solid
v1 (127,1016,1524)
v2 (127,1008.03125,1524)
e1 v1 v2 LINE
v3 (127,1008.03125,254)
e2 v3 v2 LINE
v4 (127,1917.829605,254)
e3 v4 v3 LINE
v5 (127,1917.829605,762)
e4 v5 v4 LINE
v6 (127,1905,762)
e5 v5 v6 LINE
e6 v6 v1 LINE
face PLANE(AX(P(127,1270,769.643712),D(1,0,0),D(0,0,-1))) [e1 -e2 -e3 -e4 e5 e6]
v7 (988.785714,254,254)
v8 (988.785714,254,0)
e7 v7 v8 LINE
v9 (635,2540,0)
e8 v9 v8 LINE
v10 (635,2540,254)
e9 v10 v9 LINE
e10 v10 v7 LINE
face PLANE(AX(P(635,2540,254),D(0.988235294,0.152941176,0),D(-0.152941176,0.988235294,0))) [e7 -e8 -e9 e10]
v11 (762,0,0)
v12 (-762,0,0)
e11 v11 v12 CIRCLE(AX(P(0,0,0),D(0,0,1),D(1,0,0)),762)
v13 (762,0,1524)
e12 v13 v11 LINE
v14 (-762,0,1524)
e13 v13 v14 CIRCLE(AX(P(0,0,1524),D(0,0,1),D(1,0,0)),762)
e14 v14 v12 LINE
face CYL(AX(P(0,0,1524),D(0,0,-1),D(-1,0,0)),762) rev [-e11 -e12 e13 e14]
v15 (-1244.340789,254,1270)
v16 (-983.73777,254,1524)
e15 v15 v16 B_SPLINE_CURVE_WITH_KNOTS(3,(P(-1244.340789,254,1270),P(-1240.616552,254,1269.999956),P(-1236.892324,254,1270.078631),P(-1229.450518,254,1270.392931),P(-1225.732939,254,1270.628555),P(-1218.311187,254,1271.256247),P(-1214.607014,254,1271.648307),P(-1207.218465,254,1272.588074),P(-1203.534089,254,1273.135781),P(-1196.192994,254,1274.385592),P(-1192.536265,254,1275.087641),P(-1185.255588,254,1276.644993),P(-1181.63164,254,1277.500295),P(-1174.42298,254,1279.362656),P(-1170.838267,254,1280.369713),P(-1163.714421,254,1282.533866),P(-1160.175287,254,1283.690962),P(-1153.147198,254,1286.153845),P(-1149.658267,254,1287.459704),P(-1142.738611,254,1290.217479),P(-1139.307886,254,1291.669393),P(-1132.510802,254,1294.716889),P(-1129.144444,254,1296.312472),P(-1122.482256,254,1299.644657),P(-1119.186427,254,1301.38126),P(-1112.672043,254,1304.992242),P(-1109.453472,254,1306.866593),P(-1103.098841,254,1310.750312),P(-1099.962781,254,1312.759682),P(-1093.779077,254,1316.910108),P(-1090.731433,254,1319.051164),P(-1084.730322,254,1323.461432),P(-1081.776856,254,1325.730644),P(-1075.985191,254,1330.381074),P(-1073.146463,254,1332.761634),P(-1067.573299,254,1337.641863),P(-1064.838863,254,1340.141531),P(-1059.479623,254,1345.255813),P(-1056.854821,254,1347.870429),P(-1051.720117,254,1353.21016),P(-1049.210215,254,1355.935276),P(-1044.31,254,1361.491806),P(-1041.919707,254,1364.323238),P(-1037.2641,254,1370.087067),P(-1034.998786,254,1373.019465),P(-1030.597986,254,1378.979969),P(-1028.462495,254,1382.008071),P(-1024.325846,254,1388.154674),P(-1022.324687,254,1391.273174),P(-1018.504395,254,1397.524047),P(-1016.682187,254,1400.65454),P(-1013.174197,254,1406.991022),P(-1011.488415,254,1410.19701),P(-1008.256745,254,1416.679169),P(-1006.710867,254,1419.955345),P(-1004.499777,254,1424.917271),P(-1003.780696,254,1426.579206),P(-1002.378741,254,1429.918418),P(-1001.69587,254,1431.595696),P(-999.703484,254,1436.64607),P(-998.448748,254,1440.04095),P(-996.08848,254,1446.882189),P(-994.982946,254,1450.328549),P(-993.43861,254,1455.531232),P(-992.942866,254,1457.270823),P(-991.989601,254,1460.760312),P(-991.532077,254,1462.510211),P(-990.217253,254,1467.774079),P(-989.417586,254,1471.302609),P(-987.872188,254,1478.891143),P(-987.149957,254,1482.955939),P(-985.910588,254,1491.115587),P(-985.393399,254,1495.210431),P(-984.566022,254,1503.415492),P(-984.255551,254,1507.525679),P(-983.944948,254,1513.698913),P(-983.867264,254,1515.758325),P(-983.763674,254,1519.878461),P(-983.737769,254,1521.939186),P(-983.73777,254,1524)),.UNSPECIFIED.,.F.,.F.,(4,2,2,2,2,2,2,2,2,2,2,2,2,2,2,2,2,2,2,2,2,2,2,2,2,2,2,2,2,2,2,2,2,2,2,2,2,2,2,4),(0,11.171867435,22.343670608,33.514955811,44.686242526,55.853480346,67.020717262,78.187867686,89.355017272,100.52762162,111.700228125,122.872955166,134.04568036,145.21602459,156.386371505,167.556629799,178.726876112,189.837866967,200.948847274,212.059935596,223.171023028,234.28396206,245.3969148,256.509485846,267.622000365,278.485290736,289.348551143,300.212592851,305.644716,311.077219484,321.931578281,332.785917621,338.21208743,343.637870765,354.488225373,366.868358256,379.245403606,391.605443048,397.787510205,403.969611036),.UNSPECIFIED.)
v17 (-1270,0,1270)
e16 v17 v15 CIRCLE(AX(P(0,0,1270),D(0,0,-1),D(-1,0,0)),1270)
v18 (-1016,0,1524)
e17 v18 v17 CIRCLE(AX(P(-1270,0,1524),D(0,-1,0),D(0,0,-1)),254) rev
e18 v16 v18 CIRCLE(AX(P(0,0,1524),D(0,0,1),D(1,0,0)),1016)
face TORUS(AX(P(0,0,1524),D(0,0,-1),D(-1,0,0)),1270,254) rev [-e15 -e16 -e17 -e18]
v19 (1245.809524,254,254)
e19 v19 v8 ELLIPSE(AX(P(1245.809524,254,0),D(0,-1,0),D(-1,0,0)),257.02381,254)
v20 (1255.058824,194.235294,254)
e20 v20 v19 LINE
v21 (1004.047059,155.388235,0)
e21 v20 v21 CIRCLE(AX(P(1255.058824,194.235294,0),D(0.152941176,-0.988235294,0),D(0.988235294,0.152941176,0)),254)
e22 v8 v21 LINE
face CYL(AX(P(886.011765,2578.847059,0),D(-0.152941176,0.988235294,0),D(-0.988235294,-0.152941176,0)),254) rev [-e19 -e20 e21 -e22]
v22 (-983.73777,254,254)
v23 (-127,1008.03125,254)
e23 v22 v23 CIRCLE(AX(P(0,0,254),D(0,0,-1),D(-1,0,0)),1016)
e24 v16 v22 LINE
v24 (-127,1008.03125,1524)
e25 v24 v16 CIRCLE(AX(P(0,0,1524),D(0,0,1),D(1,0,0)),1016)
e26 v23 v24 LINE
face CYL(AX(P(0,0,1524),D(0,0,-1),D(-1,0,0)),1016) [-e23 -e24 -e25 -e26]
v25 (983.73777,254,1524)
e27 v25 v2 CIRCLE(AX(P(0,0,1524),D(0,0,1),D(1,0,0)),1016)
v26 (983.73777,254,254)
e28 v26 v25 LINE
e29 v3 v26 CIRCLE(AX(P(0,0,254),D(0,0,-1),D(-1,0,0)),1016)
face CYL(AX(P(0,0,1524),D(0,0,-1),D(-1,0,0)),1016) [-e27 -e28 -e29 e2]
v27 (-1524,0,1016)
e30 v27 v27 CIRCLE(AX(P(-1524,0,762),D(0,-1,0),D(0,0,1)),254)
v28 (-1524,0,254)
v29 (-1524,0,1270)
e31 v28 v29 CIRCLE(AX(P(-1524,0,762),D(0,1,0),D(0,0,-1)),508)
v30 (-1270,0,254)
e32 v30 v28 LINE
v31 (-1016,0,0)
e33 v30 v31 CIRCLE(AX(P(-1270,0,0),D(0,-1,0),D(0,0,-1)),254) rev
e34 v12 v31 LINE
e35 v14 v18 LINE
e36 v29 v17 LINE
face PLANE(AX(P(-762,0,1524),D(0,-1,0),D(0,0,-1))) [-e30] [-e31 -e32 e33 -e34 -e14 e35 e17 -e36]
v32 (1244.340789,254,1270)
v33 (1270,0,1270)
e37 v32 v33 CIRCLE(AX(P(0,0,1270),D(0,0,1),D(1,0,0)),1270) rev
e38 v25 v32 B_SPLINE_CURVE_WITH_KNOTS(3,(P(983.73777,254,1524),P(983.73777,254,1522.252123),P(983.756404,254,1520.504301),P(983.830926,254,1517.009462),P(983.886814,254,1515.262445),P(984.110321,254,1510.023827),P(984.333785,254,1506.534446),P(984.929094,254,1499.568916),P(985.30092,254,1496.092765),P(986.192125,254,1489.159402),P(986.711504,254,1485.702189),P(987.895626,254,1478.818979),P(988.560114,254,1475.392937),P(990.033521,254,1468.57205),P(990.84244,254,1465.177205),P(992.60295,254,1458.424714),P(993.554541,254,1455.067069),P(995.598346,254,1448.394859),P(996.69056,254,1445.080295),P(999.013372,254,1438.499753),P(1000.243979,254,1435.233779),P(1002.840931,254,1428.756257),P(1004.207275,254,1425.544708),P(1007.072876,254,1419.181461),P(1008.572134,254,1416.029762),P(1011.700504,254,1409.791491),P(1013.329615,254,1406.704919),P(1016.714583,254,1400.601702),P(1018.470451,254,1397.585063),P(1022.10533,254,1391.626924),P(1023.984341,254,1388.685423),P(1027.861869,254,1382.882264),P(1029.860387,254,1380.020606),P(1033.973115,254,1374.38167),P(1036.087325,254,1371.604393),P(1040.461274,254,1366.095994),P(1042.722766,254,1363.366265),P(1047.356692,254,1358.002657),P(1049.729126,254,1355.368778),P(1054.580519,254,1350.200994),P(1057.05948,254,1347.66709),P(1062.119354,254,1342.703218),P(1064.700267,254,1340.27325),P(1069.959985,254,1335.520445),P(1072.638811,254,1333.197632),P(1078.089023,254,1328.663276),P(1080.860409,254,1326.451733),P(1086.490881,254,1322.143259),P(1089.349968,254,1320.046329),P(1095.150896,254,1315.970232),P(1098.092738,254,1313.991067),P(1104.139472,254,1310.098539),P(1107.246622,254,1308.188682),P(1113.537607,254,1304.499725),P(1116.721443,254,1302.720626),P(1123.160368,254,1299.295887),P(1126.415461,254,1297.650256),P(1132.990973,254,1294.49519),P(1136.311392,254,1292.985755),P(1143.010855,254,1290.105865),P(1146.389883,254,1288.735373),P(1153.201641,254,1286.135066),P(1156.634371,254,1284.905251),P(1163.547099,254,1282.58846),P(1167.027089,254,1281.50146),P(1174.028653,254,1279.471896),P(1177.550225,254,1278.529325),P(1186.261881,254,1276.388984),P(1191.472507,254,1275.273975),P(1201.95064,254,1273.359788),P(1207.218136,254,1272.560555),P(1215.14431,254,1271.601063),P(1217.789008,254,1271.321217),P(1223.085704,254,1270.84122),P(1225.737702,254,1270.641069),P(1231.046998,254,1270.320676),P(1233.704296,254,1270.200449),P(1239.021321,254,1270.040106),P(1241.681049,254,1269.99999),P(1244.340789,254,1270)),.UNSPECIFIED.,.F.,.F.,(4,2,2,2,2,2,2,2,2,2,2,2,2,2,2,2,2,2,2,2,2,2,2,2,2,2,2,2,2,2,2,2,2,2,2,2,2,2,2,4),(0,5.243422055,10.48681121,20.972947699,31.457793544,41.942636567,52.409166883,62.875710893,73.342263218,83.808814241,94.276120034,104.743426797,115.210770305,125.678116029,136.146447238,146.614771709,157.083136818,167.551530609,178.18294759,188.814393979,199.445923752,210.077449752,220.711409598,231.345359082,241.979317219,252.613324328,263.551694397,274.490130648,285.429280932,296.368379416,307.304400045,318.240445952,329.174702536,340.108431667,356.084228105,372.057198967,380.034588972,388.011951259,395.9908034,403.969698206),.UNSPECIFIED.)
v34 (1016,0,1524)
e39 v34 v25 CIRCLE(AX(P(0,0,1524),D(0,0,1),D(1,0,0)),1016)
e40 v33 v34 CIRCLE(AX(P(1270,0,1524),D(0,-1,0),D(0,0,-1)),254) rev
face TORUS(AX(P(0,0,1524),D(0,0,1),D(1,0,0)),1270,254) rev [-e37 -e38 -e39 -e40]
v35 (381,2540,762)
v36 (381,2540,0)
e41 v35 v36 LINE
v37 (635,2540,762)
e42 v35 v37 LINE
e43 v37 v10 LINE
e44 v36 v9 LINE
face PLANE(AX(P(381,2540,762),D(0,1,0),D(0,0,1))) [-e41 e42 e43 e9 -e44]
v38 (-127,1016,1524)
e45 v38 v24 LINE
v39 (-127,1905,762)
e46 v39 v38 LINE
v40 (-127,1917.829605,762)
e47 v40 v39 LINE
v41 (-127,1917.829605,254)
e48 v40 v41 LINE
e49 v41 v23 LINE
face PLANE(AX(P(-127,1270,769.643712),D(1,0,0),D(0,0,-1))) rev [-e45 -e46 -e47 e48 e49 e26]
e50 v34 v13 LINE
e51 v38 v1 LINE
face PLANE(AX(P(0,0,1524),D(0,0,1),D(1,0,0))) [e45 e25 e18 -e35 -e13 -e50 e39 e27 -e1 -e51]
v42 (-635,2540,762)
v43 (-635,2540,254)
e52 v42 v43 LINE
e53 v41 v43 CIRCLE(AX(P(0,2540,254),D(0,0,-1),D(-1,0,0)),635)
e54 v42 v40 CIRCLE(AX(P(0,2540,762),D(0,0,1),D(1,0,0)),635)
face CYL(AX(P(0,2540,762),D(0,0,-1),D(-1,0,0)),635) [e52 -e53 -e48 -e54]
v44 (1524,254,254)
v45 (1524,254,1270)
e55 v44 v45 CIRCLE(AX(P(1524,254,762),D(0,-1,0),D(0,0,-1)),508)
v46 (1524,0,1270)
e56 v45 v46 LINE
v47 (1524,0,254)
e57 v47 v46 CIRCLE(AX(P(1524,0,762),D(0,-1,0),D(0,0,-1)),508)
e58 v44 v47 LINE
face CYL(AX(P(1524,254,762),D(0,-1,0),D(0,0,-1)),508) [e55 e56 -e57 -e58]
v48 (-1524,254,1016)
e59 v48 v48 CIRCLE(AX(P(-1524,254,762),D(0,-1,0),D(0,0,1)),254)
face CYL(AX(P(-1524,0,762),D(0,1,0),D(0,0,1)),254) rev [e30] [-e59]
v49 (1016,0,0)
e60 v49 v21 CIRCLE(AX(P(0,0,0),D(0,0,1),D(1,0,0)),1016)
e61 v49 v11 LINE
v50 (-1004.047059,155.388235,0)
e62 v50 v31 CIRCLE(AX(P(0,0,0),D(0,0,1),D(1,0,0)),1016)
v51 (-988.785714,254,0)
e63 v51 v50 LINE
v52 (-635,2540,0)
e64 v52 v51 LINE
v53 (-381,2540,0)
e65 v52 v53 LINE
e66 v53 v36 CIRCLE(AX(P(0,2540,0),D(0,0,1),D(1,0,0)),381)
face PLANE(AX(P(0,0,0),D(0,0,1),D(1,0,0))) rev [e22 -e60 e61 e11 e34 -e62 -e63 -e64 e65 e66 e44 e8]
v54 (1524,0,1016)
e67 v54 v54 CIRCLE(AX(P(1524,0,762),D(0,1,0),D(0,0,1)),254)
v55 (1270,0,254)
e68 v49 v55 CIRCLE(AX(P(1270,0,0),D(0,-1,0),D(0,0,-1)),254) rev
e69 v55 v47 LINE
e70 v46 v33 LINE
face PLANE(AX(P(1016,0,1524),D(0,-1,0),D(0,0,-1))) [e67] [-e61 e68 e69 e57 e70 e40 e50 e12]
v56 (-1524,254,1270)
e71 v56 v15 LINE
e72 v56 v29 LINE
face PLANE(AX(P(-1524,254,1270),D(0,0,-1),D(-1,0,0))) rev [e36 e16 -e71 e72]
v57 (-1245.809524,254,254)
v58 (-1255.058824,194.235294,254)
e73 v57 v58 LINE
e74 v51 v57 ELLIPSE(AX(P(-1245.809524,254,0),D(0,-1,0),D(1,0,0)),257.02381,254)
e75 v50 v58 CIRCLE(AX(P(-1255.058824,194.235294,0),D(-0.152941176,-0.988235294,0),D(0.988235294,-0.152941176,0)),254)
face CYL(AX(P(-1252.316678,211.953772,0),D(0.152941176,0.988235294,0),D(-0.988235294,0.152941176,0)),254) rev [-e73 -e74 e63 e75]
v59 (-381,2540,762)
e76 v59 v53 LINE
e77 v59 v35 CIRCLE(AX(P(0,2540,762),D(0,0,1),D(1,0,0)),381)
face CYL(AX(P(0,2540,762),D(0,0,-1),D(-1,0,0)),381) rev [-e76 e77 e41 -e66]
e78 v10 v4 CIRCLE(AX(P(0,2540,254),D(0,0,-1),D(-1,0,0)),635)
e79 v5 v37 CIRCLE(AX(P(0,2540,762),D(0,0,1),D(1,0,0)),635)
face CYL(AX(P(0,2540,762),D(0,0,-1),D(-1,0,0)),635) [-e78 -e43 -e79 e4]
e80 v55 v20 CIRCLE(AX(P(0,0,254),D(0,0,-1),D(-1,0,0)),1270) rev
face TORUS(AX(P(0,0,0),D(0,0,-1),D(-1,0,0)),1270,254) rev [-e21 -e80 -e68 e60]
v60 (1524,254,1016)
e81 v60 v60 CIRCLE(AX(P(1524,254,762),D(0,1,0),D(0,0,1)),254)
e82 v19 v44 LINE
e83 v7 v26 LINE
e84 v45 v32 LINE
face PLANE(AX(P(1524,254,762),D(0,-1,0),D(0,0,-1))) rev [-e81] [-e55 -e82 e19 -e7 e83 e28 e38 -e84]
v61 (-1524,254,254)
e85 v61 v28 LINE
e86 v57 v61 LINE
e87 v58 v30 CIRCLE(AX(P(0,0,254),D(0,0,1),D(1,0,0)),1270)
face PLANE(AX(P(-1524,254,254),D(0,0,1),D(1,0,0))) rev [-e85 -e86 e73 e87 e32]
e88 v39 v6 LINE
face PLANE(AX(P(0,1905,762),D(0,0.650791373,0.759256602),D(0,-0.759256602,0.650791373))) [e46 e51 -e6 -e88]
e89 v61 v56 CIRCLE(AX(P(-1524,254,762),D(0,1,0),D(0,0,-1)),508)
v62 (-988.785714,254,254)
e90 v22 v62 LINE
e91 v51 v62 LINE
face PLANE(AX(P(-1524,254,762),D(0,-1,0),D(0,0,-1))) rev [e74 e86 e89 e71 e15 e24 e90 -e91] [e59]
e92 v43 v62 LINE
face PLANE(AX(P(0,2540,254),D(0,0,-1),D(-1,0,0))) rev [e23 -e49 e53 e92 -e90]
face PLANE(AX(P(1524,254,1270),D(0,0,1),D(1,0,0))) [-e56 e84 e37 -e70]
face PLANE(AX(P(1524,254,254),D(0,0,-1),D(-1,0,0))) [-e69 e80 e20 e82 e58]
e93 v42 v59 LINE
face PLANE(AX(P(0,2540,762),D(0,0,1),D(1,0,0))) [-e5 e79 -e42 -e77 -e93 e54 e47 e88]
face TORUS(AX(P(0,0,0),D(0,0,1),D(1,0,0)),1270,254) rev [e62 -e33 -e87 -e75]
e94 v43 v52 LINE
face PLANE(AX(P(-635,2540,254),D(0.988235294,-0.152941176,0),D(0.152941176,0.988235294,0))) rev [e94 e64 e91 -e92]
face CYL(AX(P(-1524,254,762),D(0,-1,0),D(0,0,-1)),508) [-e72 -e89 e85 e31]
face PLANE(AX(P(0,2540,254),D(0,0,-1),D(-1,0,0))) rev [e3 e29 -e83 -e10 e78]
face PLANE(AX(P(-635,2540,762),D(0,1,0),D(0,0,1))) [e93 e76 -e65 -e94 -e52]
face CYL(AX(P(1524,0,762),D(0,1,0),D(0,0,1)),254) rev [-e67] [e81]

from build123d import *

# Parameters (mm, degrees)
BOSS_EXTRUDE2_DEPTH  = 1524
BOSS_EXTRUDE3_DEPTH  = 762
BOSS_EXTRUDE4_DEPTH  = 254
BOSS_EXTRUDE5_DEPTH  = 254
SKETCH5_R            = 254
CUT_EXTRUDE1_DEPTH   = 3418.220507957
FILLET1_R            = 254
FILLET1_OF_MIRROR1_R = 254
RIB3_START           = -127
RIB3_DEPTH           = 254


with BuildPart() as part:
    # Sketch1 → Boss-Extrude2 (new body)
    with BuildSketch(Plane.XY):
        with BuildLine():
            Line((1016, 0), (762, 0))
            ThreePointArc((762, 0), (0, 762), (-762, 0))
            Line((-762, 0), (-1016, 0))
            ThreePointArc((-1016, 0), (0, 1016), (1016, 0))
        make_face()
    extrude(amount=BOSS_EXTRUDE2_DEPTH)



with BuildPart() as body_2:
    # Sketch1<6> → Boss-Extrude3 (new body)
    with BuildSketch(Plane.XY):
        with BuildLine():
            Line((-635, 2540), (-381, 2540))
            ThreePointArc((-381, 2540), (0, 2159), (381, 2540))
            Line((381, 2540), (635, 2540))
            ThreePointArc((635, 2540), (0, 1905), (-635, 2540))
        make_face()
    extrude(amount=BOSS_EXTRUDE3_DEPTH)


with BuildPart() as part_1:
    add(part.part)

    add(body_2.part)  # Boss-Extrude4 merges body 2
    # Sketch2 → Boss-Extrude4 (add)
    with BuildSketch(Plane(origin=(0, 0, 0), x_dir=(-1, 0, 0), z_dir=(0, 0, -1))):
        with BuildLine():
            Line((-635, 2540), (-1004.047058824, 155.388235294))
            ThreePointArc((-1004.047058824, 155.388235294), (0, 1016), (1004.047058824, 155.388235294))
            Line((1004.047058824, 155.388235294), (635, 2540))
            ThreePointArc((635, 2540), (0, 1905), (-635, 2540))
        make_face()
    extrude(amount=-BOSS_EXTRUDE4_DEPTH)

    # Sketch3 → Boss-Extrude5 (add)
    with BuildSketch(Plane.XZ):
        with BuildLine():
            Line((1524, 254), (908.235803169, 254))
            Line((908.235803169, 254), (908.235803169, 1270))
            Line((908.235803169, 1270), (1524, 1270))
            ThreePointArc((1524, 1270), (2032, 762), (1524, 254))
        make_face()
    boss_extrude5 = extrude(amount=-BOSS_EXTRUDE5_DEPTH)

    # Sketch5 → Cut-Extrude1 (cut, through all)
    with BuildSketch(Plane(origin=(0, 254, 0), x_dir=(1, 0, 0), z_dir=(0, 1, 0))):
        with Locations(Location((1524, -762, 0), (0, 0, 270))):
            Circle(SKETCH5_R)
    cut_extrude1 = extrude(amount=-CUT_EXTRUDE1_DEPTH, mode=Mode.SUBTRACT)

    # Fillet1
    fillet1_edges = [part_1.edges().sort_by_distance(p)[0] for p in [
        (996.416386555, 204.694117647, 254),
        (1013.00735727, 77.923642867, 254),
        (1007.902171407, 128.020361162, 1270),
    ]]
    fillet(fillet1_edges, radius=FILLET1_R - 0.0001)  # a hair under: the kernel refuses the full size

    # Mirror1: Boss-Extrude5, Cut-Extrude1 across plane
    add(boss_extrude5.mirror(Plane(origin=(0, 0, 0), x_dir=(0, 0, 1), z_dir=(1, 0, 0))))
    add(cut_extrude1.mirror(Plane(origin=(0, 0, 0), x_dir=(0, 0, 1), z_dir=(1, 0, 0))), mode=Mode.SUBTRACT)

    # Fillet1 of Mirror1
    fillet1_of_mirror1_edges = [part_1.edges().sort_by_distance(p)[0] for p in [
        (-996.416386555, 204.694117647, 254),
        (-1013.00735727, 77.923642867, 254),
        (-1007.902171407, 128.020361162, 1270),
    ]]
    fillet(fillet1_of_mirror1_edges, radius=FILLET1_OF_MIRROR1_R - 0.0001)  # a hair under: the kernel refuses the full size

    # Rib3: read off the stored shape, not the designer's step
    # Rib3 outline → Rib3 (add)
    with BuildSketch(Plane(origin=(0, 0, 0), x_dir=(0, 0, -1), z_dir=(1, 0, 0)).offset(RIB3_START)):
        Polygon((-1524, 1016), (-1524, 1008.031249516), (-254, 1008.031249516), (-254, 1917.829605333), (-762, 1917.829605333), (-762, 1905), align=None)
    extrude(amount=RIB3_DEPTH)


solid = part_1.part
